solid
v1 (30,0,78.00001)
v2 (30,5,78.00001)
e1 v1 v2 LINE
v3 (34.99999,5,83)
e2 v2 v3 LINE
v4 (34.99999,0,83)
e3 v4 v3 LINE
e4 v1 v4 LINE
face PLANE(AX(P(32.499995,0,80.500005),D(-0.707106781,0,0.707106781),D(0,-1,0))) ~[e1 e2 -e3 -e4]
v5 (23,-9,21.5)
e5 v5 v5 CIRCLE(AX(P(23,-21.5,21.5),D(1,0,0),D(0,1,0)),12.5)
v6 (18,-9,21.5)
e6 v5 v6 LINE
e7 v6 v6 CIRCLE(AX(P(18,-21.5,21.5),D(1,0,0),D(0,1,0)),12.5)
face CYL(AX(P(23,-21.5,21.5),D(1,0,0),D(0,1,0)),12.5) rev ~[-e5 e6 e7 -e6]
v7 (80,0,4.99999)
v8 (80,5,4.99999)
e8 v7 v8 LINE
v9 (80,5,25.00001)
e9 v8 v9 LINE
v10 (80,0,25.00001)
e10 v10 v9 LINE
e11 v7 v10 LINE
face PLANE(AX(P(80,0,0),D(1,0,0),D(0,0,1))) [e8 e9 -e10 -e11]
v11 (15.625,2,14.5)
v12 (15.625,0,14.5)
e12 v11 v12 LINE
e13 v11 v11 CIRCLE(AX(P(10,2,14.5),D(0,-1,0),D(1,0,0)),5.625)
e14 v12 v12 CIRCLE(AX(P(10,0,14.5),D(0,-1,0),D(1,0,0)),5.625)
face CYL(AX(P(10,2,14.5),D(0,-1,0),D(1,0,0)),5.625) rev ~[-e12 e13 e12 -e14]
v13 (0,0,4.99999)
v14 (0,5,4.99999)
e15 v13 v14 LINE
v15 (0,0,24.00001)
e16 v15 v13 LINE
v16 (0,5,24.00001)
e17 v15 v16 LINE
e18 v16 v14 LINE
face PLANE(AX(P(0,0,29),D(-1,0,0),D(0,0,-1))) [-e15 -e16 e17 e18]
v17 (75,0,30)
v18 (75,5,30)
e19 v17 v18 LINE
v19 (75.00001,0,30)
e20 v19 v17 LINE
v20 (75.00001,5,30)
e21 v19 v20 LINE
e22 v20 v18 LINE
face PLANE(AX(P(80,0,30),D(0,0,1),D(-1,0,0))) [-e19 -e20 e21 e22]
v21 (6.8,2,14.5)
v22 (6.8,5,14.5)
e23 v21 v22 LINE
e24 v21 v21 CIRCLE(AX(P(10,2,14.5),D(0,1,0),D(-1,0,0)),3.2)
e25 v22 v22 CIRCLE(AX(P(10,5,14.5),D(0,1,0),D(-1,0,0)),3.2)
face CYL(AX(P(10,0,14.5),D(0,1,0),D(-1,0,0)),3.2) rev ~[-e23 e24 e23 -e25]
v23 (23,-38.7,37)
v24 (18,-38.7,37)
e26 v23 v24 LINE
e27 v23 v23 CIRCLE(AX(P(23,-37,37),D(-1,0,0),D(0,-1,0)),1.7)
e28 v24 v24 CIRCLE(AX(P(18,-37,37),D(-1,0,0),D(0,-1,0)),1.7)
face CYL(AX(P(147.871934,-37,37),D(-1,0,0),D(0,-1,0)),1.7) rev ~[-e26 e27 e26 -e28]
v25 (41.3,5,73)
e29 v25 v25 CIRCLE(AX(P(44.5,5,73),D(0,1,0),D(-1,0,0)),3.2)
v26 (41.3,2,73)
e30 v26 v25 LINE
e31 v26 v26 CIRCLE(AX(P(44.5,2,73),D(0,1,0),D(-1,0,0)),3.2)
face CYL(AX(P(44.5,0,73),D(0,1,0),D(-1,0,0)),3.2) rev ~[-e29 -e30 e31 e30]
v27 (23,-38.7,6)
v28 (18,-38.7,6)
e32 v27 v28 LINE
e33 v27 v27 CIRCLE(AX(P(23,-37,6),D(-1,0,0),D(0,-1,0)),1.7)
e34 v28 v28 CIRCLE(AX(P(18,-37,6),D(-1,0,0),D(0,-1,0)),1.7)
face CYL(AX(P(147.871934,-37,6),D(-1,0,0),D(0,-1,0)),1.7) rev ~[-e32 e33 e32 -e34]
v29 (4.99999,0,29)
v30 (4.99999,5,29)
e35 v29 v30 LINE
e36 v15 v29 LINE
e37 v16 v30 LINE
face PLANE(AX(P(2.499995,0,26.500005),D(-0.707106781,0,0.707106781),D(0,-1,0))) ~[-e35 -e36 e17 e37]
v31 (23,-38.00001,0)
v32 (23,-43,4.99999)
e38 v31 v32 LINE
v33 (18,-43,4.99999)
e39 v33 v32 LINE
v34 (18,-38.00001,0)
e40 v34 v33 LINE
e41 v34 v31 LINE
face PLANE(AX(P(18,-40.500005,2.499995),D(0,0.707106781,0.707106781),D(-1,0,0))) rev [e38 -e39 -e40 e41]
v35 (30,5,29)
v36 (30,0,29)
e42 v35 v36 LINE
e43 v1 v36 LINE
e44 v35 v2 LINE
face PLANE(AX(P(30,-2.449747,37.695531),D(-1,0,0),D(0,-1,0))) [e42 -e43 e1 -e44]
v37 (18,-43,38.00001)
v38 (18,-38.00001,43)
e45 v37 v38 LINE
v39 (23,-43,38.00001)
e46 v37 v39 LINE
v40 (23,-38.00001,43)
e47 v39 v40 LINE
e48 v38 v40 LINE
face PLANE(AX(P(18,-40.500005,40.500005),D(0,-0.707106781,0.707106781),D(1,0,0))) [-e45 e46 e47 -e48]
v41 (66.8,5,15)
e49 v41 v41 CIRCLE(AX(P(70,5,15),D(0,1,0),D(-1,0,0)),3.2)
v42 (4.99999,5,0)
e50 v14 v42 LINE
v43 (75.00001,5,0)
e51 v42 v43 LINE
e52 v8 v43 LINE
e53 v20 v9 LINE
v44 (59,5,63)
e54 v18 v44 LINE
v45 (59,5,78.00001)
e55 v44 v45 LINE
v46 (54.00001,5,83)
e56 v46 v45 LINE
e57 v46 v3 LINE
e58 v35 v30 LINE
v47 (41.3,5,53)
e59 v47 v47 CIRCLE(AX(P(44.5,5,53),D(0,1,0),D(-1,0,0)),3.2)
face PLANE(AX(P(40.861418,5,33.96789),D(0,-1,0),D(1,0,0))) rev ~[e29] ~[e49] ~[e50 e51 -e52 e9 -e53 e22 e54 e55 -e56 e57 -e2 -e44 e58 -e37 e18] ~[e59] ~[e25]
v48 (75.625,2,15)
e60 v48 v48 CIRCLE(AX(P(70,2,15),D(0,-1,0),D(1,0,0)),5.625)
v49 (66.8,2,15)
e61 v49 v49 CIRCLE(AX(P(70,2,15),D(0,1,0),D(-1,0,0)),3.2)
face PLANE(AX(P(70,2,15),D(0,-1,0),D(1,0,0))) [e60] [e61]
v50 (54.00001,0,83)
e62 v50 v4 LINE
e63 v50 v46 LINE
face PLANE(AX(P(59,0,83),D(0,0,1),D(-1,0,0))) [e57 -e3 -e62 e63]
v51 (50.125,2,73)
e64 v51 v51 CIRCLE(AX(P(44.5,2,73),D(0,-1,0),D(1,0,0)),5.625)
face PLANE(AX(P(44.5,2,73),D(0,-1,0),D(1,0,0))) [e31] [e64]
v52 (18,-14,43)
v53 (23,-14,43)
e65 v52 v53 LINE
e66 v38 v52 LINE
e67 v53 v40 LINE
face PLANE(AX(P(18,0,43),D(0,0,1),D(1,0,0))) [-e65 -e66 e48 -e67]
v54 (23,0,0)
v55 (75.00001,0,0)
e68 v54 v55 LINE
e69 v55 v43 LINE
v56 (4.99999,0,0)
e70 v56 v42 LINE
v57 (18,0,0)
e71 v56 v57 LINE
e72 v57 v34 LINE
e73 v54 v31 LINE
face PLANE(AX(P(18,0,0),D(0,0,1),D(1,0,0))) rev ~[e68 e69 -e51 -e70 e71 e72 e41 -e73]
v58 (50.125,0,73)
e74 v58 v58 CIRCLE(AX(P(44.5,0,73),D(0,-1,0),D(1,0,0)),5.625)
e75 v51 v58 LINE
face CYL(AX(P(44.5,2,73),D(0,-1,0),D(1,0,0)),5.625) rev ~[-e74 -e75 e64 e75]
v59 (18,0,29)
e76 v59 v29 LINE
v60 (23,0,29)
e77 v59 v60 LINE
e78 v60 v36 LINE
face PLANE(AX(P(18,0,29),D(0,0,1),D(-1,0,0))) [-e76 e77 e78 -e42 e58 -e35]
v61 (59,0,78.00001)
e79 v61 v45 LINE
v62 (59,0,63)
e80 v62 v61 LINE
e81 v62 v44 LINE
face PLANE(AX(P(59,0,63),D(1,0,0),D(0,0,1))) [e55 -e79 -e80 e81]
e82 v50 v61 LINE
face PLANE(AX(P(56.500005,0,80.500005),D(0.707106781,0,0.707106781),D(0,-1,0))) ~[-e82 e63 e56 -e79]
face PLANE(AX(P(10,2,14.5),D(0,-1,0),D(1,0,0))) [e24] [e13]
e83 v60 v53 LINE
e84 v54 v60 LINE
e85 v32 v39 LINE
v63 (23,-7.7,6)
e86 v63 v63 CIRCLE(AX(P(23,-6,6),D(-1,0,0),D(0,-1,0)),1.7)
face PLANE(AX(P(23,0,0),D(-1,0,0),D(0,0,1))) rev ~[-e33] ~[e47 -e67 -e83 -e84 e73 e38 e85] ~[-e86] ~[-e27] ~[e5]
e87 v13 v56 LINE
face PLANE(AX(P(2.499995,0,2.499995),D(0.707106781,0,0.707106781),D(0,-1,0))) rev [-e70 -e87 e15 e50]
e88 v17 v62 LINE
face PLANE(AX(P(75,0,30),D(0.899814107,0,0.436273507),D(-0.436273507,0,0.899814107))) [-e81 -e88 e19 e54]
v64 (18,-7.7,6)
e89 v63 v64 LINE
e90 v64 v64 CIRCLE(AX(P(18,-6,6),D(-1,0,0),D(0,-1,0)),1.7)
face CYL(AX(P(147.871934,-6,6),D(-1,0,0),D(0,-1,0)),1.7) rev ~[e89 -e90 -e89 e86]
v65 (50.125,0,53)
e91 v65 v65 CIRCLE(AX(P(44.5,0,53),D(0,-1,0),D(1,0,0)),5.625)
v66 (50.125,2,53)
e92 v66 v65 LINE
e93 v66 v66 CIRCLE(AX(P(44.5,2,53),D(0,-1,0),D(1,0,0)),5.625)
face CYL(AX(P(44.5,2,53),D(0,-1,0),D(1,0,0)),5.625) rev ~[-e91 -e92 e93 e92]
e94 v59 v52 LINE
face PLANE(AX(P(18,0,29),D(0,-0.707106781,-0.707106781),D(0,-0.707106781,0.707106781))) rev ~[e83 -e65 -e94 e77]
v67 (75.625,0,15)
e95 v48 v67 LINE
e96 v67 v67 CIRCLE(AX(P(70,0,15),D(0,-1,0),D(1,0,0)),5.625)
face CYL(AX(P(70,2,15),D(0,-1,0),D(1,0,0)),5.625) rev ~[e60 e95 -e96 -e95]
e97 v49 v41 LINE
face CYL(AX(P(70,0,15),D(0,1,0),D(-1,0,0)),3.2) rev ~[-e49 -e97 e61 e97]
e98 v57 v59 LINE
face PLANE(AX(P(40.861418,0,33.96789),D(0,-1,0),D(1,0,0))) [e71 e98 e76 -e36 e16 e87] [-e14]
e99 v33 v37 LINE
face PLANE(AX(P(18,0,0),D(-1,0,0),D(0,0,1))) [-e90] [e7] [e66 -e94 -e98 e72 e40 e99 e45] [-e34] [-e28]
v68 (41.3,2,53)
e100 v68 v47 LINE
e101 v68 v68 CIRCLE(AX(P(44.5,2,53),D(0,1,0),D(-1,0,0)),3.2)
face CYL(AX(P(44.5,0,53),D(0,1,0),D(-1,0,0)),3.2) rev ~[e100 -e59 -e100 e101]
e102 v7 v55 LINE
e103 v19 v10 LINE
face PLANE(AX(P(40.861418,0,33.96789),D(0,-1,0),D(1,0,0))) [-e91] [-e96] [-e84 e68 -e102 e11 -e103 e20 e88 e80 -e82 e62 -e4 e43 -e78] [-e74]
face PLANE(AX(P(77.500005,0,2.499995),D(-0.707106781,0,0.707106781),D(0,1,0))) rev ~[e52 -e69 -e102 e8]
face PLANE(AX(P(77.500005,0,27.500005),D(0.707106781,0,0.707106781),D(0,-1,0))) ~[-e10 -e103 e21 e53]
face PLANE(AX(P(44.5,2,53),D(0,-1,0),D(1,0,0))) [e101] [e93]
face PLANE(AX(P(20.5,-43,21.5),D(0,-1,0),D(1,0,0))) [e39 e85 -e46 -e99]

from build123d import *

# Parameters (mm, degrees)
F1_DEPTH       = 5
F2_D           = 6.4
F2_CBORE_D     = 11.25
F2_CBORE_DEPTH = 2
F3_W           = 5
F3_H           = 43
F4_DEPTH       = 43
F6_D           = 3.4
F5_R           = 12.5
F7_DEPTH       = 23.001
F10_DEPTH      = 12
F11_SIZE       = 4.99999


# Not quite as in the source:
# - a fillet or chamfer is up to 0.001 mm smaller than in the source, because OpenCascade refuses the exact size
# - a feature names something its author has since deleted; it is built from what else it names


with BuildPart() as f1:
    # F0 (on Front) → F1 (new body)
    with BuildSketch(Plane.XZ):
        Polygon((0, 29), (0, 0), (80, 0), (80, 30), (75, 30), (59, 63), (59, 83), (30, 83), (30, 43), (18, 43), (18, 29), align=None)
    extrude(amount=-F1_DEPTH)

    # F2 (through all)
    with Locations(Plane.XZ):
        with Locations((10, 14.5), (44.5, 53), (44.5, 73), (70, 15)):
            CounterBoreHole(F2_D / 2, F2_CBORE_D / 2, F2_CBORE_DEPTH)

    # F3 (on face) → F4 (join)
    with BuildSketch(Plane.XZ):
        with Locations((20.5, 21.5)):
            Rectangle(F3_W, F3_H)
    extrude(amount=F4_DEPTH)

    # F6 (through all)
    with Locations(Plane.YZ.offset(23)):
        with Locations((-37, 37), (-6, 6), (-37, 6)):
            Hole(F6_D / 2)

    # F5 (on face) → F7 (cut, through all)
    with BuildSketch(Plane.YZ.offset(23)):
        with Locations((-21.5, 21.5)):
            Circle(F5_R)
    extrude(amount=-F7_DEPTH, mode=Mode.SUBTRACT)

    # F9 (on face) → F10 (cut, through all)
    with BuildSketch(Plane(origin=(18, 0, 0), x_dir=(0, -1, 0), z_dir=(-1, 0, 0))):
        Polygon((14, 43), (-5, 43), (-5, 29), (0, 29), align=None)
    extrude(amount=-F10_DEPTH, mode=Mode.SUBTRACT)

    # F11 (size 5 in the source; OpenCascade refuses exactly that, so slightly less here)
    f11_edges = [f1.edges().sort_by_distance(p)[0] for p in [
        (30, 2.5, 83),
        (59, 2.5, 83),
        (80, 2.5, 30),
        (80, 2.5, 0),
        (20.5, -43, 0),
        (0, 2.5, 0),
        (0, 2.5, 29),
        (20.5, -43, 43),
    ]]
    chamfer(f11_edges, length=F11_SIZE)


solid = f1.part
